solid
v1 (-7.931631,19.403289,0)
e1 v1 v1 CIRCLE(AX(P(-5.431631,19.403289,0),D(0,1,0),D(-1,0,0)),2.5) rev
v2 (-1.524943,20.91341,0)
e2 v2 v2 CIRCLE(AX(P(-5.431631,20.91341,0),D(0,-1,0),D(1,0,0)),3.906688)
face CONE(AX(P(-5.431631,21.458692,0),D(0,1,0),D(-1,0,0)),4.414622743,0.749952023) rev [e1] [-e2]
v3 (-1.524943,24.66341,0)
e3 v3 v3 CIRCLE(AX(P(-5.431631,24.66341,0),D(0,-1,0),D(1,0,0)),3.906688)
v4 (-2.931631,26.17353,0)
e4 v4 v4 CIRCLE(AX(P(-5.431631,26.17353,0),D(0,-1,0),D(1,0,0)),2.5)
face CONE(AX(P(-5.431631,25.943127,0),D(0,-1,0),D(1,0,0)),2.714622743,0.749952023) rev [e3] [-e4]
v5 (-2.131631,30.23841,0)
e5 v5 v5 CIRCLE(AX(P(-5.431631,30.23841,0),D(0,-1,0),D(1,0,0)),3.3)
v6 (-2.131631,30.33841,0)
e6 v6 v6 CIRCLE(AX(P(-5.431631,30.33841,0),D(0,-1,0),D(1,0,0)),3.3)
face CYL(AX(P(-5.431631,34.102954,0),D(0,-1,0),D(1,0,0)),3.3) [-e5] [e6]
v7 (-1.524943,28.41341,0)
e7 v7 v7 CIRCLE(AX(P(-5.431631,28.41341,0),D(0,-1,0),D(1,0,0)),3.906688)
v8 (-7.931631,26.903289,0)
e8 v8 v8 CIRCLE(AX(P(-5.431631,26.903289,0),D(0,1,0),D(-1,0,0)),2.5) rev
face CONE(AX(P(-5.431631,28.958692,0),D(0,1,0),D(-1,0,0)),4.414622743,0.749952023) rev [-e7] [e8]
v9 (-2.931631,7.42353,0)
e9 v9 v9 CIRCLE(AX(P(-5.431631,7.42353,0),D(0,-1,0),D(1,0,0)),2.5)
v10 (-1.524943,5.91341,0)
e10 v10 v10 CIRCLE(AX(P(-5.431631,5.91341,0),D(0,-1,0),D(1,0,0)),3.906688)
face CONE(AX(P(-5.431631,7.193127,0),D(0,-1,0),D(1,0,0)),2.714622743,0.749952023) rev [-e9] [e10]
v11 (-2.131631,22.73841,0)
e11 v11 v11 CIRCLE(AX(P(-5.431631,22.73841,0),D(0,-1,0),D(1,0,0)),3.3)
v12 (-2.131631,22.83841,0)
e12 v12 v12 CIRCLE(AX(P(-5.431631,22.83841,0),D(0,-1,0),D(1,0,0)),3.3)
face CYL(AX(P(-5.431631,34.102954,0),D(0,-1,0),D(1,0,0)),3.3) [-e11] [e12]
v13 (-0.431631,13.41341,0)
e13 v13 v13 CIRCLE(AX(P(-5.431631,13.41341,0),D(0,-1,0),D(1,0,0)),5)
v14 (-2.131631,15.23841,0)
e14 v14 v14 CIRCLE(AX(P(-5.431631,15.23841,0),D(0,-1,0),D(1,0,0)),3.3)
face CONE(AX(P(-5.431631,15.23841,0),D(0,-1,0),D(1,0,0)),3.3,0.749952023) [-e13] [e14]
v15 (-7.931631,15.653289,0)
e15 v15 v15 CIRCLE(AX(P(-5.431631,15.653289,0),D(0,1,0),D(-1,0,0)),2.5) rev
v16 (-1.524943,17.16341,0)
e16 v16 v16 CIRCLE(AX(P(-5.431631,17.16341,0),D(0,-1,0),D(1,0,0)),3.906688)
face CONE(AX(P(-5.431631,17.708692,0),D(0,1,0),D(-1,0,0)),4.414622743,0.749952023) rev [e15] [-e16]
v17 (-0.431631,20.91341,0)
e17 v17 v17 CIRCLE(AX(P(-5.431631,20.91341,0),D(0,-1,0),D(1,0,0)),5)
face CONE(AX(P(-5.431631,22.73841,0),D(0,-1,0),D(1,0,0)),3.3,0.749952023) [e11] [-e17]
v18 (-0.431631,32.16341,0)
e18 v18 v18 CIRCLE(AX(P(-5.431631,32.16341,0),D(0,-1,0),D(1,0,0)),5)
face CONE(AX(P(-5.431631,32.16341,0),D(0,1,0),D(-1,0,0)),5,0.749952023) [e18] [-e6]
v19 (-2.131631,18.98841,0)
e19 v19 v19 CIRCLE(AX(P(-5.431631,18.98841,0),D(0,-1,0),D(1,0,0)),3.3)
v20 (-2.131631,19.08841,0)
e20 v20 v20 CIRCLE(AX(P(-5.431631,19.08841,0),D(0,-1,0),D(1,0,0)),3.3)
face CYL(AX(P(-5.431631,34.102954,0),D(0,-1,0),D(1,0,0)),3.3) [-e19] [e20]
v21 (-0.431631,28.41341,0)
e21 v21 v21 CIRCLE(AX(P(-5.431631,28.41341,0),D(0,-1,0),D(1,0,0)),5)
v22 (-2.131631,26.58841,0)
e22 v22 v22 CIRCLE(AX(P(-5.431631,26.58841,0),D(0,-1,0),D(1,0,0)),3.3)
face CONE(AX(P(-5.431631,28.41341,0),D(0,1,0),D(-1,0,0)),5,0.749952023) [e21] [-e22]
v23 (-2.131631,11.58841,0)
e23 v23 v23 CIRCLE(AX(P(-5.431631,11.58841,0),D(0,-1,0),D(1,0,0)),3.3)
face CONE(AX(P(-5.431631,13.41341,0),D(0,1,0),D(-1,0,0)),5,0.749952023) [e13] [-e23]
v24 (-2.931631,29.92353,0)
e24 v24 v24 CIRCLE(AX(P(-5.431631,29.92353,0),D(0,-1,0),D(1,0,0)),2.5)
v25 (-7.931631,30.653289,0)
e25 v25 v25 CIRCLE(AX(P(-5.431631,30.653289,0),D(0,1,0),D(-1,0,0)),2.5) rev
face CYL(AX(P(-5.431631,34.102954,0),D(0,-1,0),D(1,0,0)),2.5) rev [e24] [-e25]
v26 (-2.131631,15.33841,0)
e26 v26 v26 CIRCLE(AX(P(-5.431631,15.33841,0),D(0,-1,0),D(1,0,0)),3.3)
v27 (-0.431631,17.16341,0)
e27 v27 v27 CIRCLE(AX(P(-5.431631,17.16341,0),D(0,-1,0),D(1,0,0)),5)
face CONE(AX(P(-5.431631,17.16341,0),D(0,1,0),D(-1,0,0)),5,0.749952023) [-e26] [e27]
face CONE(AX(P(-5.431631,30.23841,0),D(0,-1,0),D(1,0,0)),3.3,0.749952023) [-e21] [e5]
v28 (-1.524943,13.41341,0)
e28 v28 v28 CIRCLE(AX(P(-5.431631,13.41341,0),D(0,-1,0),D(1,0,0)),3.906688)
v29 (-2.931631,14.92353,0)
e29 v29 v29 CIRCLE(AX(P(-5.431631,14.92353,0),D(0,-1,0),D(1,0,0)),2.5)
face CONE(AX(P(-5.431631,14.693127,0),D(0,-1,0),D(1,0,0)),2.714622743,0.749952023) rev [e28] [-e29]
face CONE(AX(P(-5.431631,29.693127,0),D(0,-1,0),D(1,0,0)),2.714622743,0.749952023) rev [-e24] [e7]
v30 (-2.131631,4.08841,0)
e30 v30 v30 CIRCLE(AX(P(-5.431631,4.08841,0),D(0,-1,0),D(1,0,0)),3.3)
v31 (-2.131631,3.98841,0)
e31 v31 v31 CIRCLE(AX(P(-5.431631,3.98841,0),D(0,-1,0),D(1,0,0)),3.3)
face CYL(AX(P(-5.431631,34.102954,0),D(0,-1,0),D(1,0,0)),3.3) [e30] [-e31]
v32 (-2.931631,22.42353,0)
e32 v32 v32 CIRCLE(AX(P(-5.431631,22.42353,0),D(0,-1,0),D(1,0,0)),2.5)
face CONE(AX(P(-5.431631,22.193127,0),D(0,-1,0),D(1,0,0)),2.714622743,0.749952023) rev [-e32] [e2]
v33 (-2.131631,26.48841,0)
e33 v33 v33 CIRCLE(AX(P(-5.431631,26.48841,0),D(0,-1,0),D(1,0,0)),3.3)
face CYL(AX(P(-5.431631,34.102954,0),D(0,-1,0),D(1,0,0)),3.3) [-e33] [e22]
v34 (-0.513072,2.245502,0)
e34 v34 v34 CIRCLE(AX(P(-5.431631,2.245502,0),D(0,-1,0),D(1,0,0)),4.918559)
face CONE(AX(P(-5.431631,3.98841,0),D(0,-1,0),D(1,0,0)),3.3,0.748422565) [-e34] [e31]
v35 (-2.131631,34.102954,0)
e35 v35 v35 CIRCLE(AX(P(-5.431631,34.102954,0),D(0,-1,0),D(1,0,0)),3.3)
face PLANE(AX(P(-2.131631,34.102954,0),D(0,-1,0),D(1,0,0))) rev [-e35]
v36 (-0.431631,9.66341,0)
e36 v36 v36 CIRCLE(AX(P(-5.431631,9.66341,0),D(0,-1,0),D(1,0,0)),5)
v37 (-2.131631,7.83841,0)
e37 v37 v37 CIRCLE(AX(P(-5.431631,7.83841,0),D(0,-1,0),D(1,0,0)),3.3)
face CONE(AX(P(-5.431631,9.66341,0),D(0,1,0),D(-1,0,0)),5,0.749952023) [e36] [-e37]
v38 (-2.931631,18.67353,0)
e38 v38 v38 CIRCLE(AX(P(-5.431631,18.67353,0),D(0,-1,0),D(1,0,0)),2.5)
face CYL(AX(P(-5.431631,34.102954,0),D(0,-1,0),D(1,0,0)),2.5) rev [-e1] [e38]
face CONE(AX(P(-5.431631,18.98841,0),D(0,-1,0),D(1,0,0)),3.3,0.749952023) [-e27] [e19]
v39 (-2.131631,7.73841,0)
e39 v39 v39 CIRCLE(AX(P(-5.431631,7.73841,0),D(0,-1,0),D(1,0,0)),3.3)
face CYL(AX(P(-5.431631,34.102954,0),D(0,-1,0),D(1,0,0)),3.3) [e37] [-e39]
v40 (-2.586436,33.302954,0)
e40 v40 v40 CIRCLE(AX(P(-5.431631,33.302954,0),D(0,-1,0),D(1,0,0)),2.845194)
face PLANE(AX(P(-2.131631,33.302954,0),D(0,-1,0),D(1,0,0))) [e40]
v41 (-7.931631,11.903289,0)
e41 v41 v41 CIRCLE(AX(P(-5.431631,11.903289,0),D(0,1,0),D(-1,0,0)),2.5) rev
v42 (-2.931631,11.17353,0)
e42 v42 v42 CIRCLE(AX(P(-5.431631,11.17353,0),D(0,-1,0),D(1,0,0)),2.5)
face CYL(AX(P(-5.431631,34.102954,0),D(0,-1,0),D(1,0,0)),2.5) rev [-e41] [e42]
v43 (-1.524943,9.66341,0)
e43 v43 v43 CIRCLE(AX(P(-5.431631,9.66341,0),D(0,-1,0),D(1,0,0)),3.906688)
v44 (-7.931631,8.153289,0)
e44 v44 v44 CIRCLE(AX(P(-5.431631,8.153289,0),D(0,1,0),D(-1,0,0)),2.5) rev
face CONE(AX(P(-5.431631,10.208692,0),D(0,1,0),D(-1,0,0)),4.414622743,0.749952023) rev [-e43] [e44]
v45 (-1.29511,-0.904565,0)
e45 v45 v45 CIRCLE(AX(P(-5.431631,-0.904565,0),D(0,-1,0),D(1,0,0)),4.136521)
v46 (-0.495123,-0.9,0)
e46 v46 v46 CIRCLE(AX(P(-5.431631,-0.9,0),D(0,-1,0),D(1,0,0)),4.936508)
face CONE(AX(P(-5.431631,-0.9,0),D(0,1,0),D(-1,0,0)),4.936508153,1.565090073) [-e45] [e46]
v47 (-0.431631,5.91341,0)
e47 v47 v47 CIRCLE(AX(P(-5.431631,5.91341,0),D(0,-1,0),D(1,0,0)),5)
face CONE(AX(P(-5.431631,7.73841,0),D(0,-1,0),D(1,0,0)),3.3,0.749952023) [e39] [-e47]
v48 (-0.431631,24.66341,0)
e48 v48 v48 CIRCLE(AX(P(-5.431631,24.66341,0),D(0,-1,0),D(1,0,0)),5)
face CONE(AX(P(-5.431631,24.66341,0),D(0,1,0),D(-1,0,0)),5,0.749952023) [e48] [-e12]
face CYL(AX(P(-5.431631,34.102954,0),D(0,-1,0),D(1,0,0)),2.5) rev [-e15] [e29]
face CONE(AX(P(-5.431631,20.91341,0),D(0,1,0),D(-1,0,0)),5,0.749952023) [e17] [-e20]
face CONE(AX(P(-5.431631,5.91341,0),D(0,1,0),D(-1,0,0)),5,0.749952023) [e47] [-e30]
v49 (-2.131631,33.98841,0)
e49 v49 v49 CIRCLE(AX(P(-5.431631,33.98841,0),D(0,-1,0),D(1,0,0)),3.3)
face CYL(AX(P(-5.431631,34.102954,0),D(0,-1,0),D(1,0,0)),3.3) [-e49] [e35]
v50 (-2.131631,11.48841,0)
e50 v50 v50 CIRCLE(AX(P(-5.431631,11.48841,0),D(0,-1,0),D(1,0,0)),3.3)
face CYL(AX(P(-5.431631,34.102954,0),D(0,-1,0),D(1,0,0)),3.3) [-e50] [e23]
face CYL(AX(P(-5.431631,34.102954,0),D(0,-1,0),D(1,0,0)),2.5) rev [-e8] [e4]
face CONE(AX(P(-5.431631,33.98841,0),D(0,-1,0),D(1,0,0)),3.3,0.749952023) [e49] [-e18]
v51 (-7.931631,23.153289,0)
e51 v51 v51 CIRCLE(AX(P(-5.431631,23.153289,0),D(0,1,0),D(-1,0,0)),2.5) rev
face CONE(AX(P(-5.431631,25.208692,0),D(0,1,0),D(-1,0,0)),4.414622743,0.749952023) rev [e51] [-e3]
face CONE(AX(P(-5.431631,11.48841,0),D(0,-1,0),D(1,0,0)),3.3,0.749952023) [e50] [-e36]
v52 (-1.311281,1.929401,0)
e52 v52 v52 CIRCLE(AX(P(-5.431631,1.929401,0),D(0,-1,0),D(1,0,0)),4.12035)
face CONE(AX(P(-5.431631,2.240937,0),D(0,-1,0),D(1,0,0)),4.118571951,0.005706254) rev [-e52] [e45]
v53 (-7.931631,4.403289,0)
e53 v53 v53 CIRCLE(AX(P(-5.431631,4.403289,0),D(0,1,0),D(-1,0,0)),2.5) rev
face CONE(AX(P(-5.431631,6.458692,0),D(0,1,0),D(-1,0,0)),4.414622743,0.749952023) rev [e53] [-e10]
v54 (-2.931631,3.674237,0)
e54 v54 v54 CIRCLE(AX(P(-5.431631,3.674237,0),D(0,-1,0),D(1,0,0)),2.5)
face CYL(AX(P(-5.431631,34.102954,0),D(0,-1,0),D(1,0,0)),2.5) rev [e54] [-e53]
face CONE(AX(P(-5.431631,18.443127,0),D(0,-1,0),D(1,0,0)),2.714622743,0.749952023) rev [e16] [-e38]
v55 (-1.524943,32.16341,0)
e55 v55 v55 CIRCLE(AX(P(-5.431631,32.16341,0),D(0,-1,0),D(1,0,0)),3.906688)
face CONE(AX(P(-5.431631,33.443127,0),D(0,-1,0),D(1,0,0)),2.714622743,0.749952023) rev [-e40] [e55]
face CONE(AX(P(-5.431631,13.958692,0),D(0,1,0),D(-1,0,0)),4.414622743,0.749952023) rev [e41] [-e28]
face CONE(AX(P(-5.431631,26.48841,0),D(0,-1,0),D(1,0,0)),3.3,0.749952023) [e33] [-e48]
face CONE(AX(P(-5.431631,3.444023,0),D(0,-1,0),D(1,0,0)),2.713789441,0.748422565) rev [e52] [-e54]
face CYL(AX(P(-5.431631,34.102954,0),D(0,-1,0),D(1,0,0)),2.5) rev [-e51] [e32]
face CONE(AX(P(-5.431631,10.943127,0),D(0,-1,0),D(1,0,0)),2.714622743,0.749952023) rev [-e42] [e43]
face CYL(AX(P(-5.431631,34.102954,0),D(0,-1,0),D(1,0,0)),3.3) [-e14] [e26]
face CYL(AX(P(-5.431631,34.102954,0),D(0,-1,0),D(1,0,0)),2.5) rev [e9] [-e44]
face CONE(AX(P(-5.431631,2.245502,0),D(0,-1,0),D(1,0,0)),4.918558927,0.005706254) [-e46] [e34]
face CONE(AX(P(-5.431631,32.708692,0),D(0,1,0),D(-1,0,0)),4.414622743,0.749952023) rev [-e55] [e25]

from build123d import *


# Read off the part's stored shape, not the designer's step: Thicken2
with BuildPart() as part:
    # Thicken2 outline → Thicken2 (revolve)
    with BuildSketch(Plane(origin=(-5.431630681, 0, 0), x_dir=(1, 0, 0), z_dir=(0, 0, 1))):
        Polygon((4.120349674, 1.929400611), (4.136521177, -0.904564978), (4.936508153, -0.9), (4.918558927, 2.245501685), (3.3, 3.988409531), (3.3, 4.088409531), (5, 5.913409531), (3.3, 7.738409531), (3.3, 7.838409531), (5, 9.663409531), (3.3, 11.488409531), (3.3, 11.588409531), (5, 13.413409531), (3.3, 15.238409531), (3.3, 15.338409531), (5, 17.163409531), (3.3, 18.988409531), (3.3, 19.088409531), (5, 20.913409531), (3.3, 22.738409531), (3.3, 22.838409531), (5, 24.663409531), (3.3, 26.488409531), (3.3, 26.588409531), (5, 28.413409531), (3.3, 30.238409531), (3.3, 30.338409531), (5, 32.163409531), (3.3, 33.988409531), (3.3, 34.102954004), (0, 34.102954004), (0, 33.302954004), (2.845194483, 33.302954004), (3.906687965, 32.163409531), (2.5, 30.653288628), (2.5, 29.923530434), (3.906687965, 28.413409531), (2.5, 26.903288628), (2.5, 26.173530434), (3.906687965, 24.663409531), (2.5, 23.153288628), (2.5, 22.423530434), (3.906687965, 20.913409531), (2.5, 19.403288628), (2.5, 18.673530434), (3.906687965, 17.163409531), (2.5, 15.653288628), (2.5, 14.923530434), (3.906687965, 13.413409531), (2.5, 11.903288628), (2.5, 11.173530434), (3.906687965, 9.663409531), (2.5, 8.153288628), (2.5, 7.423530434), (3.906687965, 5.913409531), (2.5, 4.403288628), (2.5, 3.674236782), align=None)
    revolve(axis=Axis((-5.431630681, 0, 0), (0, 1, 0)))


solid = part.part
